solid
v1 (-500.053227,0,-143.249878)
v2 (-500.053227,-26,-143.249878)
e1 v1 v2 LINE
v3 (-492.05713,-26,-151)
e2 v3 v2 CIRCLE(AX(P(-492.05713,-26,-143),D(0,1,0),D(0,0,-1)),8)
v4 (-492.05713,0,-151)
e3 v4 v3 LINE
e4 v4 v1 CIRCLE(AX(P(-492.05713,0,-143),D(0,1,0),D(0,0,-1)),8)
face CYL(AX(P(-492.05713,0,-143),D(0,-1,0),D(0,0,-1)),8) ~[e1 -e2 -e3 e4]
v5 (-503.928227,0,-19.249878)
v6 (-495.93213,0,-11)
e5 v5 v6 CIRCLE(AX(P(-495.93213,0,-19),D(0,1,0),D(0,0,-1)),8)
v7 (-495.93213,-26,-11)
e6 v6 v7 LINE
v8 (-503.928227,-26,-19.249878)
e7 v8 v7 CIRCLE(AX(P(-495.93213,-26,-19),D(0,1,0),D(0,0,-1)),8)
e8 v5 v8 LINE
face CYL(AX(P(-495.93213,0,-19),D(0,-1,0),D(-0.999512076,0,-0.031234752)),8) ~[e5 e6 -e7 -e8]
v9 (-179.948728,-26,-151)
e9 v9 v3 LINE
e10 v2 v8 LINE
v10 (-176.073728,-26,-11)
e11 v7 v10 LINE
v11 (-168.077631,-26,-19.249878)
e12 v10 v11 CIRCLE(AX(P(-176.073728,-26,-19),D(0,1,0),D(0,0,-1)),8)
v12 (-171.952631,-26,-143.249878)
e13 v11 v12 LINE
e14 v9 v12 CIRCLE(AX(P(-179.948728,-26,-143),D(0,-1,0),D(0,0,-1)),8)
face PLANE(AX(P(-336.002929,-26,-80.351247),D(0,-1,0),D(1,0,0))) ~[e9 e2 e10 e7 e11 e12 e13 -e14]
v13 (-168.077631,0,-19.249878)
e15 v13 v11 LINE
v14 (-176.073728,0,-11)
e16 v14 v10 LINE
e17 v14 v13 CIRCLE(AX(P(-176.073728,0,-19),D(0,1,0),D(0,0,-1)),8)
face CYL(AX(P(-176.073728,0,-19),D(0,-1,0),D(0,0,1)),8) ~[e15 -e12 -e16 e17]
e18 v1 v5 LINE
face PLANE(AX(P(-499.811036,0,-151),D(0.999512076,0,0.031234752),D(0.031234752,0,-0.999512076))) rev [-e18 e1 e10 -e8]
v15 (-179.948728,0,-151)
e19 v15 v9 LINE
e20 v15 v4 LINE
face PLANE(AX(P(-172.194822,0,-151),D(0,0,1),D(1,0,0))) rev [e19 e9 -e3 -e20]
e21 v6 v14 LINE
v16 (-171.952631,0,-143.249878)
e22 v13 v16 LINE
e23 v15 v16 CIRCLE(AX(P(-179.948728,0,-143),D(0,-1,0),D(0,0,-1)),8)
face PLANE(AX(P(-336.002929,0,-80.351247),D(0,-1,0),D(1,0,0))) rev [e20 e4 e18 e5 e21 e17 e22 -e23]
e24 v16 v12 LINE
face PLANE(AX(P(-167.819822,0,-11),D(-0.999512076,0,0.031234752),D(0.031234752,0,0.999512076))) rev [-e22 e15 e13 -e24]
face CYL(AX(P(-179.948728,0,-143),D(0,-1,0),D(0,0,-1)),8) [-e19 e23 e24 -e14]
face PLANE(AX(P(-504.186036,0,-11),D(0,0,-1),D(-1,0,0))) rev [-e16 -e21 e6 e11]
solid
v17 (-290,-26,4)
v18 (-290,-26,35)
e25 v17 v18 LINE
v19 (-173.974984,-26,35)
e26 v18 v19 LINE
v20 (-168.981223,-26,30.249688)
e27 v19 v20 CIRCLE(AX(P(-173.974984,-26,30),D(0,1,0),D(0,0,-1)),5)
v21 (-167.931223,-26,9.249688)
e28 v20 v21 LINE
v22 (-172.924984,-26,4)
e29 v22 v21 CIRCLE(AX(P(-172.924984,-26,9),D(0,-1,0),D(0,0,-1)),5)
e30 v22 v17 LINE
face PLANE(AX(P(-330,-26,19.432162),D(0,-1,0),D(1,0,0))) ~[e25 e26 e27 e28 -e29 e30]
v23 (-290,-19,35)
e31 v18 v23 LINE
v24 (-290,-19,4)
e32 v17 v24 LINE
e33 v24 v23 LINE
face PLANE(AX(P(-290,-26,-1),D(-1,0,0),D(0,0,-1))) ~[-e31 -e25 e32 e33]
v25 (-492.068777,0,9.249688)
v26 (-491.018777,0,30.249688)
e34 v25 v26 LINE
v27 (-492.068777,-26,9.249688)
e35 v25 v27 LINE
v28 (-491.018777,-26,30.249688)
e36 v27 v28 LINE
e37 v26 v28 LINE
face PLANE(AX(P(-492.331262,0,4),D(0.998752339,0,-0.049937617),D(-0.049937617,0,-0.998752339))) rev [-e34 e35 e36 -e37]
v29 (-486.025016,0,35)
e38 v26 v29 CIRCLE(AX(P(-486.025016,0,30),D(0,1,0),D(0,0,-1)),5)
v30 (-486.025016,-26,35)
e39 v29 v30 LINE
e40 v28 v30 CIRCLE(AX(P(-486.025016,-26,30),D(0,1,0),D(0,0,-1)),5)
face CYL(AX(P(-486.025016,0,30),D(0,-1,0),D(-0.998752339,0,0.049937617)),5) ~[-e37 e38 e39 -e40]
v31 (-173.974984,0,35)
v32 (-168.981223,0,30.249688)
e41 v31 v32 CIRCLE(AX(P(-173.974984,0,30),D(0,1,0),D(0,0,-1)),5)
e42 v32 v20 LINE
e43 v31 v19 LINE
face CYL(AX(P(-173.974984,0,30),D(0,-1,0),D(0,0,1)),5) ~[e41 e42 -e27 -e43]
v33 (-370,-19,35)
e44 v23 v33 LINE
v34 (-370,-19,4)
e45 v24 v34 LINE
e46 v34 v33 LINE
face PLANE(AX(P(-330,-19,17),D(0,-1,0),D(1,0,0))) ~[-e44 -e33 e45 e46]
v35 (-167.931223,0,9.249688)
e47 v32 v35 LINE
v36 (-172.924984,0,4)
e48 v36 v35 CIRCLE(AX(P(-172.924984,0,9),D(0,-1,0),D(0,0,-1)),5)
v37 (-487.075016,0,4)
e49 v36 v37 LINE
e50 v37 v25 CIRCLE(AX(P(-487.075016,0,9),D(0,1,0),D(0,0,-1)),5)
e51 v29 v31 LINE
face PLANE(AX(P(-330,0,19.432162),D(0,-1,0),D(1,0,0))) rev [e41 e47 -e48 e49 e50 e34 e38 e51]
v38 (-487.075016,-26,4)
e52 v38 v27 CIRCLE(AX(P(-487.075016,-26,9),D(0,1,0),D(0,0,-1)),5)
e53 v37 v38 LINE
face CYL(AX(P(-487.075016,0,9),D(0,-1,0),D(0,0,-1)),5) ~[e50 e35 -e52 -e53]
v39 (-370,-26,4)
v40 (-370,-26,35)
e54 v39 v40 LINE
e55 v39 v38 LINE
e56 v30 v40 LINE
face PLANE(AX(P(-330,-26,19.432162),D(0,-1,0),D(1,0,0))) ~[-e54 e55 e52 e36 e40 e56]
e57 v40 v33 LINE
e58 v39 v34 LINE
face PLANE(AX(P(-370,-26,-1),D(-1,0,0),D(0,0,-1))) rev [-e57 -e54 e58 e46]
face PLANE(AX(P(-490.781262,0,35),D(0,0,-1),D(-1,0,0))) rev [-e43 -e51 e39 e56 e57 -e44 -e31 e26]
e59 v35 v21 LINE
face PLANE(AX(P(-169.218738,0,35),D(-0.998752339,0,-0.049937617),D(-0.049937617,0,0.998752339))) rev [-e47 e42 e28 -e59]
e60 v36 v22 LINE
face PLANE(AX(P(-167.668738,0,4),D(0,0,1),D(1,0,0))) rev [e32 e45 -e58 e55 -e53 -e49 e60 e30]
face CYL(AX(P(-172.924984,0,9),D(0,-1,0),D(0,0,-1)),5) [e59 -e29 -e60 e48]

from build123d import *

# Parameters (mm, degrees)
F2_DEPTH  = 26
F4_DEPTH  = 26
F5_R      = 5
F6_W      = 80
F6_H      = 36
F7_DEPTH  = 7
F8_R      = 8
F11_W     = 342.5
F11_H     = 418.889449735
F12_DEPTH = 26.001


with BuildPart() as f2:
    # F1 (on Front) → F2 (new body)
    with BuildSketch(Plane.XZ):
        Polygon((-157.8051775685, -151), (-100.5, -151), (100.5, -151), (152.5, -151), (169.8110355137, -151), (174.1860355137, -11), (-162.1801775685, -11), (-159.6801775685, -91), align=None)
    extrude(amount=F2_DEPTH)

    # F8
    f8_edges = [f2.edges().sort_by_distance(p)[0] for p in [
        (169.811036, -13, -151),
        (-162.180178, -13, -11),
        (174.186036, -13, -11),
        (-157.805178, -13, -151),
    ]]
    fillet(f8_edges, radius=F8_R)


with BuildPart() as f4:
    # F3 (on Front) → F4 (new body)
    with BuildSketch(Plane.XZ):
        Polygon((-162.3312617041, 4), (162.3312617041, 4), (160.7812617041, 35), (-160.7812617041, 35), align=None)
    extrude(amount=F4_DEPTH)

    # F5
    f5_edges = [f4.edges().sort_by_distance(p)[0] for p in [
        (-160.781262, -13, 35),
        (-162.331262, -13, 4),
        (160.781262, -13, 35),
        (162.331262, -13, 4),
    ]]
    fillet(f5_edges, radius=F5_R)

    # F6 (on face) → F7 (cut)
    with BuildSketch(Plane.XZ.offset(26)):
        with Locations((0, 17)):
            Rectangle(F6_W, F6_H)
    extrude(amount=-F7_DEPTH, mode=Mode.SUBTRACT)


with BuildPart() as f10_1:
    # F10: instance of F4
    add(f4.part.mirror(Plane.YZ.offset(-165)))


with BuildPart() as f10_2:
    # F10: instance of F2
    add(f2.part.mirror(Plane.YZ.offset(-165)))


with BuildPart() as f12_tool:
    # F11 (on Front) → F12 (new body, through all)
    with BuildSketch(Plane.XZ):
        with Locations((6.25, 0)):
            Rectangle(F11_W, F11_H)
    extrude(amount=F12_DEPTH)


with BuildPart() as f2_1:
    add(f2.part)

    # F12: cut by f12_tool
    add(f12_tool.part, mode=Mode.SUBTRACT)


with BuildPart() as f4_1:
    add(f4.part)

    # F12: cut by f12_tool
    add(f12_tool.part, mode=Mode.SUBTRACT)


solid = Compound([f10_1.part, f10_2.part])
